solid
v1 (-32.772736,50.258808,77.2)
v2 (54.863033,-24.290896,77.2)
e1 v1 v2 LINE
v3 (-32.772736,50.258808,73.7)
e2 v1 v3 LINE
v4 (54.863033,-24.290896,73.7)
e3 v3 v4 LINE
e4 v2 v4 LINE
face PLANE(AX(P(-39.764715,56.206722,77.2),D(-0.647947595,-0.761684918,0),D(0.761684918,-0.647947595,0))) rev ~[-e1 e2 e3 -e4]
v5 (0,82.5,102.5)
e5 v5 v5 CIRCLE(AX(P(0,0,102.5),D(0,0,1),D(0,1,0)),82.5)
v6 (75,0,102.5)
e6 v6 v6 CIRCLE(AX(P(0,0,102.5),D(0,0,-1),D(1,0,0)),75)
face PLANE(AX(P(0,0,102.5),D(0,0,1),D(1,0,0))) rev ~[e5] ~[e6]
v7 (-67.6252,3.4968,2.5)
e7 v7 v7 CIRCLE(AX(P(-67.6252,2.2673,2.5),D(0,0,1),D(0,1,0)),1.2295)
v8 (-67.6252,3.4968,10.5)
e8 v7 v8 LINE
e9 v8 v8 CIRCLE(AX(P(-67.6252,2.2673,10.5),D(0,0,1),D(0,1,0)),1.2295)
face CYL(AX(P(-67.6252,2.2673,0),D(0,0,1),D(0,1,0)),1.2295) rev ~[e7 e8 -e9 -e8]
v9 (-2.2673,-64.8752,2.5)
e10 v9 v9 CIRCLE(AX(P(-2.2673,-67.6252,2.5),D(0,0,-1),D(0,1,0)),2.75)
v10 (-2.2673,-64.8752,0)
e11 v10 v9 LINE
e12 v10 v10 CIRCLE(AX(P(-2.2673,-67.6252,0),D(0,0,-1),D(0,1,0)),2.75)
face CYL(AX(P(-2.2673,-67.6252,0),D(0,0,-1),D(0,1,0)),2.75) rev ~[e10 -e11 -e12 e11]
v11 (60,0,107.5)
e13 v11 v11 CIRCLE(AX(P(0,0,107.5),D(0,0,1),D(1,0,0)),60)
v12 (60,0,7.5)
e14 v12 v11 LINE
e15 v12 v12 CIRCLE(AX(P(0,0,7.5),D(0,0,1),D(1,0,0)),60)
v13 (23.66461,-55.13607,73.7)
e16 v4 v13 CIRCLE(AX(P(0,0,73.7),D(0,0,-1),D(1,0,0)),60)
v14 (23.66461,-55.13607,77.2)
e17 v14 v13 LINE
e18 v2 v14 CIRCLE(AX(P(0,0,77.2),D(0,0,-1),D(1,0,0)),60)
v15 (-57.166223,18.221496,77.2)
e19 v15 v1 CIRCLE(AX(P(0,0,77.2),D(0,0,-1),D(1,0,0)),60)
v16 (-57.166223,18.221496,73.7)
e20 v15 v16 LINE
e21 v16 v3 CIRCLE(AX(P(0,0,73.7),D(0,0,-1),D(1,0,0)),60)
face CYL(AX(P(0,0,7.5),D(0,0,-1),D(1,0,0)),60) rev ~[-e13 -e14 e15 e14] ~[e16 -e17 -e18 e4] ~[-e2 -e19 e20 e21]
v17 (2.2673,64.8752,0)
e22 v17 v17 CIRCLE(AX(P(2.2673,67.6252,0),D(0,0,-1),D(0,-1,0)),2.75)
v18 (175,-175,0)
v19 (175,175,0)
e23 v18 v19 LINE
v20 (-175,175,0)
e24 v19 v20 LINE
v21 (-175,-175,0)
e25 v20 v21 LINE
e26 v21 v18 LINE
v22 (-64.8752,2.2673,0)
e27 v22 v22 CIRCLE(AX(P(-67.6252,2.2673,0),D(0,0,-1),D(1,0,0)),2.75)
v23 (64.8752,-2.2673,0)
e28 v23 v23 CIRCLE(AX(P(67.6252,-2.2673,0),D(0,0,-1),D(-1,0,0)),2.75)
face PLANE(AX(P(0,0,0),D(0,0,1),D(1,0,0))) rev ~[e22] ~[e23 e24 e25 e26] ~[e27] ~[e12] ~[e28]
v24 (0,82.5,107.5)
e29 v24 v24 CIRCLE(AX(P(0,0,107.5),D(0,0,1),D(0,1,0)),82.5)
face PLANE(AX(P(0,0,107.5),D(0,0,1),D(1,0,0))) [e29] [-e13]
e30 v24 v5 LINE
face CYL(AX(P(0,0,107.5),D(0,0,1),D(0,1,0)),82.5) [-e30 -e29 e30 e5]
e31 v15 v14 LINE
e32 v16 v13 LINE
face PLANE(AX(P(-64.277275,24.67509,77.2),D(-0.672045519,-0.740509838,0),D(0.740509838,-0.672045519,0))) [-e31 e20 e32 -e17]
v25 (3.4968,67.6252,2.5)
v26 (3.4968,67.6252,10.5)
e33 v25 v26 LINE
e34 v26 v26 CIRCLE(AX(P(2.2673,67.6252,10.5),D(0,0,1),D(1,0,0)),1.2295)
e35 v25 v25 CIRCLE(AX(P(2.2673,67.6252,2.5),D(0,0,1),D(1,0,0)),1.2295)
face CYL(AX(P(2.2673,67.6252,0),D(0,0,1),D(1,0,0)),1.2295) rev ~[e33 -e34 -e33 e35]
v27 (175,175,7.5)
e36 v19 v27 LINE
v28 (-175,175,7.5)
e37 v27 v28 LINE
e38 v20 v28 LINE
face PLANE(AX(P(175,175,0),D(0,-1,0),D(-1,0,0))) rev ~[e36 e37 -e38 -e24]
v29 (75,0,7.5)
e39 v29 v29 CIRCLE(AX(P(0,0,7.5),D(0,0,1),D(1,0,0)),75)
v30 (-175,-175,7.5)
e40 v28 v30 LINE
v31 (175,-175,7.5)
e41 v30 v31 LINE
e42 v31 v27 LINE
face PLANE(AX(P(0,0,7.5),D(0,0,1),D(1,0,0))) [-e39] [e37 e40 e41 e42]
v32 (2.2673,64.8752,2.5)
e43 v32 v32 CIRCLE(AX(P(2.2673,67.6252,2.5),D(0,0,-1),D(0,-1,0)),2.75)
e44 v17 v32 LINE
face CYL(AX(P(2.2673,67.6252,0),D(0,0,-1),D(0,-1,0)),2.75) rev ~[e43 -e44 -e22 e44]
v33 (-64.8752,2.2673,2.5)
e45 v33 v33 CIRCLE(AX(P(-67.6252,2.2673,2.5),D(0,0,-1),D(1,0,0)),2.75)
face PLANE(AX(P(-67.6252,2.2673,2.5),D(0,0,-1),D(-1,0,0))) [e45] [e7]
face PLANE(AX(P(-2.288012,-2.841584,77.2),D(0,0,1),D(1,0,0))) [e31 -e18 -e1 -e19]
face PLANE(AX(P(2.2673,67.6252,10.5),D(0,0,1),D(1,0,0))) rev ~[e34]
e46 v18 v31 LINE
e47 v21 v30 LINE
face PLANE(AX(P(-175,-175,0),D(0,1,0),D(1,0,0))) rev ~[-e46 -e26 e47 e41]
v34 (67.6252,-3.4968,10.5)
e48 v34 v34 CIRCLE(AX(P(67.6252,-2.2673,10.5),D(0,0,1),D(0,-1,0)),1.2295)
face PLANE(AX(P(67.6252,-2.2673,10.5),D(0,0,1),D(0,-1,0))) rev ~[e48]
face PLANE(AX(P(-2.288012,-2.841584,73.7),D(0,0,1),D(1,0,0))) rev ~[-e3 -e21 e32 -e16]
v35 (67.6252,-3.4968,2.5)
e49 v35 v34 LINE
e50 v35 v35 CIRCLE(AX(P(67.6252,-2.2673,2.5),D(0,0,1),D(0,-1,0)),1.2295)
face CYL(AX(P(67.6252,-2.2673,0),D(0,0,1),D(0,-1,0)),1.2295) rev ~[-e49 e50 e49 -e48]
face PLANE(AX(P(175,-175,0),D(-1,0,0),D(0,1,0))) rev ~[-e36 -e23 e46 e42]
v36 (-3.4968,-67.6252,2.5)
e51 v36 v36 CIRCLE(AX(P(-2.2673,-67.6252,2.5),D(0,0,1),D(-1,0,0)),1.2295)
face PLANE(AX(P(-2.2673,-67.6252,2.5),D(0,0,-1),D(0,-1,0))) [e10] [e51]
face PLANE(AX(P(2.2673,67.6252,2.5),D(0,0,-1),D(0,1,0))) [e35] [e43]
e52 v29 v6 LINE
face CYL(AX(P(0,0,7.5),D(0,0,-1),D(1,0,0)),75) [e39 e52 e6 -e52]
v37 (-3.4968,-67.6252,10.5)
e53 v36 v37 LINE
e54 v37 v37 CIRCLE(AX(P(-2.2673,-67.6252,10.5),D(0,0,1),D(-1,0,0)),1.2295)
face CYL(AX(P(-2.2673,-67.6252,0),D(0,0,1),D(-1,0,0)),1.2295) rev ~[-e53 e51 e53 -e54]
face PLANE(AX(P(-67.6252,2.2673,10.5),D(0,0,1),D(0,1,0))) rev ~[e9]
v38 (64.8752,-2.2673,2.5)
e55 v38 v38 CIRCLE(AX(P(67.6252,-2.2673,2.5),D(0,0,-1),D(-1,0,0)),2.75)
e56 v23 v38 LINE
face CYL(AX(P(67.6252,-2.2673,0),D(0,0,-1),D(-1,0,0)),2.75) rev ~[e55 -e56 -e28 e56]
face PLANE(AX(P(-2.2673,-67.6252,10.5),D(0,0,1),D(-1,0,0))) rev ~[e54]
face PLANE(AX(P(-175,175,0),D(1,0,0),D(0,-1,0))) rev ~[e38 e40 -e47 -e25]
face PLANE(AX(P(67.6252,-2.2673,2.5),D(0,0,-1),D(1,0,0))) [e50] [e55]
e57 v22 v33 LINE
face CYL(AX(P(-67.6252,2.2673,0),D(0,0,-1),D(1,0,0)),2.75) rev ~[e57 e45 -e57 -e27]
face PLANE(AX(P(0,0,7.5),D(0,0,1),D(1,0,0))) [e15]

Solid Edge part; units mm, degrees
sketch "Sketch1" plane through (0, 0, 0) normal (0, 0, 1) x (1, 0, 0)
  line L0 (-175, -175) -> (175, -175)
  line L1 (175, -175) -> (175, 175)
  line L2 (175, 175) -> (-175, 175)
  line L3 (-175, 175) -> (-175, -175)
  dimension "D1" = 350
  dimension "D2" = 350
extrude "Protrusion1" add sketch "Sketch1" along normal blind 7.5
sketch "Sketch2" plane through (0, 0, 7.5) normal (0, 0, 1) x (1, 0, 0)
  circle A0 centre (0, 0) radius 75
  circle A1 centre (0, 0) radius 60
extrude "Wyciągnięcie_2" add sketch "Sketch2" along normal blind 100
sketch "Sketch3" plane through (0, 0, 107.5) normal (0, 0, 1) x (0, 1, 0)
  circle A0 centre (0, 0) radius 82.5
  circle A1 centre (0, 0) radius 75
extrude "Wyciągnięcie_3" add sketch "Sketch3" against normal blind 5
sketch "Sketch4" plane through (0, 0, 77.2) normal (0, 0, 1) x (1, 0, 0)
  line L0 (-64.2773, 24.6751) -> (30.7757, -61.5897)
  line L1 (-39.7647, 56.2067) -> (61.855, -30.2388)
  arc A0 (-64.2773, 24.6751) -> (-39.7647, 56.2067) centre (0, 0) cw
  line L2 (30.7757, -61.5897) -> (61.855, -30.2388)
extrude "Wyciągnięcie_4" add sketch "Sketch4" against normal blind 3.5
hole "Otwór_1" at (-67.6252, 2.2673, 0) direction (0, 0, 1) diameter 2.459 depth 10.5
sketch "Sketch5" plane through (0, 0, 0) normal (0, 0, -1) x (1, 0, 0)
  circle A0 centre (-67.6252, -2.2673) radius 2.75
extrude "Wycięcie_1" cut sketch "Sketch5" against normal blind 2.5
pattern_circular "Pattern1" count 4 over 360 about axis through (0, 0, 0) along (0, 0, 1) of "Wycięcie_1", "Otwór_1"
